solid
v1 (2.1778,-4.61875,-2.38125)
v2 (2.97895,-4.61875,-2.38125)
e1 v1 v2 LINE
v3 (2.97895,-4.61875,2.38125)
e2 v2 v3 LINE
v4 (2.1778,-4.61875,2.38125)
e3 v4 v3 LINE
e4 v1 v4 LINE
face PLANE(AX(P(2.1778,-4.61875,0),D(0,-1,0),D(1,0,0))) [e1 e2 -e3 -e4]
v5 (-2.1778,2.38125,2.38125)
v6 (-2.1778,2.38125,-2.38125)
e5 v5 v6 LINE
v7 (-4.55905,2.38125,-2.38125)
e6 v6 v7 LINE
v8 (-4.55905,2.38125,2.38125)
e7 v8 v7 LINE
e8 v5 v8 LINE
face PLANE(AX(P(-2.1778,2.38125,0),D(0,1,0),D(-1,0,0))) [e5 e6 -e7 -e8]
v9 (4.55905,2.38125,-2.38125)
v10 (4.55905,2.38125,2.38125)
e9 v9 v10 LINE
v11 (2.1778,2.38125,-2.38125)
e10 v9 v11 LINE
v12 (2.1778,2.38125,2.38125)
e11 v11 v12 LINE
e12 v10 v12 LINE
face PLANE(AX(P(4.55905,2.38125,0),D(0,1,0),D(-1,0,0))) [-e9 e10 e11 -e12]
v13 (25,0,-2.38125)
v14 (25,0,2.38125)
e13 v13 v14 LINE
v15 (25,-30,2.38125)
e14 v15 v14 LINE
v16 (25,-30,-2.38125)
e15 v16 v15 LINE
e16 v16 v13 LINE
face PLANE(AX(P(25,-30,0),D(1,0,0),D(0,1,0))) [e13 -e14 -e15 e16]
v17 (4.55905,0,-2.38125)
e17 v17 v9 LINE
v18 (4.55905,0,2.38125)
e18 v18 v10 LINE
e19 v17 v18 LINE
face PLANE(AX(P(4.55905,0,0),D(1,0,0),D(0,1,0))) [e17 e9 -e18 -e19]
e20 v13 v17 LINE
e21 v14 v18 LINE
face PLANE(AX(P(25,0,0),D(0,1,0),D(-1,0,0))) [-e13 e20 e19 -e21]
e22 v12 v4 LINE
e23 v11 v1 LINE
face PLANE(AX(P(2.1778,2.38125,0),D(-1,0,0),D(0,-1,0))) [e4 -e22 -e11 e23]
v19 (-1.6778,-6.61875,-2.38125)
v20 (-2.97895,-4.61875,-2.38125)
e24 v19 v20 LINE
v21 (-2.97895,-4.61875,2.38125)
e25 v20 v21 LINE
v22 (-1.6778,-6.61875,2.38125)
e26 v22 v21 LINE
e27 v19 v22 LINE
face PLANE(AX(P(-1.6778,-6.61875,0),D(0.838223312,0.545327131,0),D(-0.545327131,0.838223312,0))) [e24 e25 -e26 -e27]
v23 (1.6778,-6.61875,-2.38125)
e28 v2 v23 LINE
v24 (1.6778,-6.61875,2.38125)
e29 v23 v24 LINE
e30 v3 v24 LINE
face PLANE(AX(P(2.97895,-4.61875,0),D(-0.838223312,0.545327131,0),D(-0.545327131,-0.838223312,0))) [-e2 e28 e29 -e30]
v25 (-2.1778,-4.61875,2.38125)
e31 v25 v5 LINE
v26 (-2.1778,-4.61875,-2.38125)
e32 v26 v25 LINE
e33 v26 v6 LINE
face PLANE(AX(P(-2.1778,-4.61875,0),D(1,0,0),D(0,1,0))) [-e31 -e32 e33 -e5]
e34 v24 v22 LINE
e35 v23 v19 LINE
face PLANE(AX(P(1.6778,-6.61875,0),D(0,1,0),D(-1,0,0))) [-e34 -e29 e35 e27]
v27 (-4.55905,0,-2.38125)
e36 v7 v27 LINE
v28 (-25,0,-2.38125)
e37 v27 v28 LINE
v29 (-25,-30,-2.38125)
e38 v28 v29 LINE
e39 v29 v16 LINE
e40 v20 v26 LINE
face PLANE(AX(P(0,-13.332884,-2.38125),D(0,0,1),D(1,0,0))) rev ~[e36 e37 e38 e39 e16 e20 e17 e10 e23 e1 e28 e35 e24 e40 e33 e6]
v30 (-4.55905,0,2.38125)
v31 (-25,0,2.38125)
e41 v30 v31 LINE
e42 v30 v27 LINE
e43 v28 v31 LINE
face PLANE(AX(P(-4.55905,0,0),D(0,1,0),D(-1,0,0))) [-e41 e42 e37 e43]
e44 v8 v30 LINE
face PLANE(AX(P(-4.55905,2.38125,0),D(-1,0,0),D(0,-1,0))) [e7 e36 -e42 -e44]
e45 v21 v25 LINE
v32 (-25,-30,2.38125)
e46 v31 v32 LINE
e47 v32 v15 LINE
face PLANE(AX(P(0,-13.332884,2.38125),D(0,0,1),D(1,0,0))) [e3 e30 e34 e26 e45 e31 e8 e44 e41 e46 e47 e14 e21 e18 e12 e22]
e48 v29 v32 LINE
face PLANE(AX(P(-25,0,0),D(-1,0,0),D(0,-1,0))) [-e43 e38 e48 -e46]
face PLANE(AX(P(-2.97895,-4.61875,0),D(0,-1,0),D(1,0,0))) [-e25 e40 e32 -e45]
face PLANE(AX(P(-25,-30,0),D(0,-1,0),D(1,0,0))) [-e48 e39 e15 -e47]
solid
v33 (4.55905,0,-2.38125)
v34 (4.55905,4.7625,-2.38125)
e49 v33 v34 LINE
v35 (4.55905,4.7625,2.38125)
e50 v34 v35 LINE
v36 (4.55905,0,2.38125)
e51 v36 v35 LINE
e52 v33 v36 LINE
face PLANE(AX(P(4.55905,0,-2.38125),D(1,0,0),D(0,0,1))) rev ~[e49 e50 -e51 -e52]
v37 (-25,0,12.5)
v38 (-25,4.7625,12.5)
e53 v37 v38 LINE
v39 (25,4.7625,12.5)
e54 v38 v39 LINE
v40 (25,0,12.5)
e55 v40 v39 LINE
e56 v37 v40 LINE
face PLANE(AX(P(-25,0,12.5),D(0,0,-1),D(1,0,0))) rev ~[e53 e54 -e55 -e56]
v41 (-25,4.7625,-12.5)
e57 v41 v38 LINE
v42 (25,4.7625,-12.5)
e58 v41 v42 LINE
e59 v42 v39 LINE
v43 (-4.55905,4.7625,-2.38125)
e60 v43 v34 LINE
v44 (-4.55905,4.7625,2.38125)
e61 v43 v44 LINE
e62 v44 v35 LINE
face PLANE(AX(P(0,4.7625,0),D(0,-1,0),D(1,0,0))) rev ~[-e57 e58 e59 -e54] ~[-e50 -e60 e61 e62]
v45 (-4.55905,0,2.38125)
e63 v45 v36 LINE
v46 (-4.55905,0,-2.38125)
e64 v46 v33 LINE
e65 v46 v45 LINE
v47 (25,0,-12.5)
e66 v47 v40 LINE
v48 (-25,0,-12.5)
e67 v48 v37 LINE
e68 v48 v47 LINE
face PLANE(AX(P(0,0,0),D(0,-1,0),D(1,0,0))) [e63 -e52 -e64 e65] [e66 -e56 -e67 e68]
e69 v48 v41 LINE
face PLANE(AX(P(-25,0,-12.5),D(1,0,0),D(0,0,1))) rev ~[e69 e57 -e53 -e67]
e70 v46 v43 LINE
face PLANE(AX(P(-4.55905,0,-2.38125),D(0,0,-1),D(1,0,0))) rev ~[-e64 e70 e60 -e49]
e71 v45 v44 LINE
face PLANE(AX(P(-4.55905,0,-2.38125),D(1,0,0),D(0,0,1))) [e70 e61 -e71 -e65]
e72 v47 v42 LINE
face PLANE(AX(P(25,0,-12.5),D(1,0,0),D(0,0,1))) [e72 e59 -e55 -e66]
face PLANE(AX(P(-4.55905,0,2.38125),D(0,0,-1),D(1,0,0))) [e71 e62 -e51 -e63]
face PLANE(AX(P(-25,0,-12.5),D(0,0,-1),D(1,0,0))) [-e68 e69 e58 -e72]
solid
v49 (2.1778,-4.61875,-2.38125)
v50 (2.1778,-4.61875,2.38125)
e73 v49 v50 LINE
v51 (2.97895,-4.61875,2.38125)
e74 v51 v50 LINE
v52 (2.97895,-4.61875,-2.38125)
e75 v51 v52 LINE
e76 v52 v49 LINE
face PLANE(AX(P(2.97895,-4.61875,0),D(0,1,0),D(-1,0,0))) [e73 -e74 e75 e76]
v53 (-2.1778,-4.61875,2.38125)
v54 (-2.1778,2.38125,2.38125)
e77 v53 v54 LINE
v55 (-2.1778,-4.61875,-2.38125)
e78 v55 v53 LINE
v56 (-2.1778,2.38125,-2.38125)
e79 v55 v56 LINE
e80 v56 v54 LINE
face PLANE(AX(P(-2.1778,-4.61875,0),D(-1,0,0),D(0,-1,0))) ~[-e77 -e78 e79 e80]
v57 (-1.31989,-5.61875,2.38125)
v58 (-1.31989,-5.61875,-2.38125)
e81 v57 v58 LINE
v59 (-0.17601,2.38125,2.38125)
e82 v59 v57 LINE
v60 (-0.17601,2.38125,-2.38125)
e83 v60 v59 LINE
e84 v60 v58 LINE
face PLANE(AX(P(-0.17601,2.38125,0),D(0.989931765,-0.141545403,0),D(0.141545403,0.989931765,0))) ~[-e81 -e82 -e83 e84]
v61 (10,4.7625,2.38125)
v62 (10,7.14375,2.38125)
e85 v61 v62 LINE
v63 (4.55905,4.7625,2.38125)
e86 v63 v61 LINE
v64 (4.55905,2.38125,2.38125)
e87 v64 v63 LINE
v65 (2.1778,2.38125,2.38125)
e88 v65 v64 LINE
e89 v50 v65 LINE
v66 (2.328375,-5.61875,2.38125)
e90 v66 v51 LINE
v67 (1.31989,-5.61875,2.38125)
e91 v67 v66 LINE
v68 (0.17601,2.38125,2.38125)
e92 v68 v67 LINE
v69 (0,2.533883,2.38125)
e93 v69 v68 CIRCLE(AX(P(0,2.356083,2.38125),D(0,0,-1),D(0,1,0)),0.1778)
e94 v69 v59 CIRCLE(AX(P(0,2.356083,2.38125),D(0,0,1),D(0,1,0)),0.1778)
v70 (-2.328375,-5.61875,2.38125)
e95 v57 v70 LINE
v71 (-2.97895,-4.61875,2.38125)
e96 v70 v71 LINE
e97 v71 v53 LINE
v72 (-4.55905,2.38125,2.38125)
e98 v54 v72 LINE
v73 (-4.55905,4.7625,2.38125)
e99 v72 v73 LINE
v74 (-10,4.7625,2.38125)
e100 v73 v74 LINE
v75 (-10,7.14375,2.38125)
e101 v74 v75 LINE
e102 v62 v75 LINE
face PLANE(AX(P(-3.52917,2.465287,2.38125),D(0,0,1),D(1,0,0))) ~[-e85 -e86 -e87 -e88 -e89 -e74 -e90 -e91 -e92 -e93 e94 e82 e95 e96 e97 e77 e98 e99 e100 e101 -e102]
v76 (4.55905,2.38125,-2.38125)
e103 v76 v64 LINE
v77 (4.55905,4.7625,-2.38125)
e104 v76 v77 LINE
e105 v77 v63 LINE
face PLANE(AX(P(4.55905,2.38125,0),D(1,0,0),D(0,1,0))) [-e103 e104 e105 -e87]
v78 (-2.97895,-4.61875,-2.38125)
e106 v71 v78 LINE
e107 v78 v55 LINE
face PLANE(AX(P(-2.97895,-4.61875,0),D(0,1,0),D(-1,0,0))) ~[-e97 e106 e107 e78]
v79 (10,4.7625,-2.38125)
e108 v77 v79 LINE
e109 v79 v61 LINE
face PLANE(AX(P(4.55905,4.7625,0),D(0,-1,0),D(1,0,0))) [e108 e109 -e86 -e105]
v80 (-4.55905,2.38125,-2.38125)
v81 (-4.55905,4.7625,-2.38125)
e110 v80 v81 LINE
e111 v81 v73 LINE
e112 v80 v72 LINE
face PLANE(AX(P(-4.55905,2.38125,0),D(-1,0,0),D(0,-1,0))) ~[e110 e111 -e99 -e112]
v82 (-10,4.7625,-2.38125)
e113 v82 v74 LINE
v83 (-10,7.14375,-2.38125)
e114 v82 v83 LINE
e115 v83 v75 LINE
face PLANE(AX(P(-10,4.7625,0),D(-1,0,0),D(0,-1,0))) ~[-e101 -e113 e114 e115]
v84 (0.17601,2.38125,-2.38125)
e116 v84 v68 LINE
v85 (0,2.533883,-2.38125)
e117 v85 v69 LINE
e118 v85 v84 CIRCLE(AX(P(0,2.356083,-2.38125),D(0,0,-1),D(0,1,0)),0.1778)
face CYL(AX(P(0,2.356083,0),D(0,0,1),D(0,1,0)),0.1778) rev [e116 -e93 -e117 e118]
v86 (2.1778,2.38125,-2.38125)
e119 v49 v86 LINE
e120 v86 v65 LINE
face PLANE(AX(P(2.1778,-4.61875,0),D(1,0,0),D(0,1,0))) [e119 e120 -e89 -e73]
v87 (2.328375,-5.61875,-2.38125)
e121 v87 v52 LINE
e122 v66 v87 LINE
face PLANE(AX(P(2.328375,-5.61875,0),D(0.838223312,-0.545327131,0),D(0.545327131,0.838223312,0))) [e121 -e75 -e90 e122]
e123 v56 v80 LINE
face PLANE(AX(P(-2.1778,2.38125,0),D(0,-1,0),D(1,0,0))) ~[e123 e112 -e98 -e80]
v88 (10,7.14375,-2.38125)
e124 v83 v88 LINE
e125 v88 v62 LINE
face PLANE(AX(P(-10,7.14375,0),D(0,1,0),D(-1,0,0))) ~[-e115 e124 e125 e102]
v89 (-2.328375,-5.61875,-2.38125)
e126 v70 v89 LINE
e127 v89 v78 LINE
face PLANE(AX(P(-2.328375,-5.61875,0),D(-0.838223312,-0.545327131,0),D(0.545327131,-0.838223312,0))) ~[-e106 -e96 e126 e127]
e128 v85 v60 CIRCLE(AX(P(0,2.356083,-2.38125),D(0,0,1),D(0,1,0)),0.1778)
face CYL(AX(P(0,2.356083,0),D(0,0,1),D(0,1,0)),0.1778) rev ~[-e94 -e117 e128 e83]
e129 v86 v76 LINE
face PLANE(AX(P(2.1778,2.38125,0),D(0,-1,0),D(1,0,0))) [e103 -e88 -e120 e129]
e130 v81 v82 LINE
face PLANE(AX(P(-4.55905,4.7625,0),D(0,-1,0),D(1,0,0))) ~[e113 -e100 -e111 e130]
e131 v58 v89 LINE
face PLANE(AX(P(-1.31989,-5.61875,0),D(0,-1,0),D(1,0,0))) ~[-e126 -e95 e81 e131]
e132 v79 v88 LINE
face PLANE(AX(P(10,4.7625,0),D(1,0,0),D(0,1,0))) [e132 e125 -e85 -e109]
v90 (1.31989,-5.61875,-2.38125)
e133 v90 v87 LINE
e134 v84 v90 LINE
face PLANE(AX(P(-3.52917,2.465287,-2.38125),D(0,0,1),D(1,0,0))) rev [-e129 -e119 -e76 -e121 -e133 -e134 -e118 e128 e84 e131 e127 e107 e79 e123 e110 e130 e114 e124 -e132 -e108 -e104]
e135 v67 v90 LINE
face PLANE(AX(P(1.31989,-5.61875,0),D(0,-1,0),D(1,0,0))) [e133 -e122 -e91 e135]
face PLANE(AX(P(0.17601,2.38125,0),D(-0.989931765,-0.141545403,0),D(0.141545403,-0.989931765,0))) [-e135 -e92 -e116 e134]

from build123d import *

# Parameters (mm, degrees)
F2_DEPTH = 2.38125
F3_W     = 50
F3_H     = 25
F3_W_2   = 9.1181
F3_H_2   = 4.7625
F4_DEPTH = 4.7625
F6_DEPTH = 2.38125


# Not quite as in the source:
# - a length typed as a fraction of an inch, garbled in the dataset ("3 / 203.2 mm" for 3/8 in), is restored


with BuildPart() as f2:
    # F1 (on Top) → F2 (new body, symmetric)
    with BuildSketch(Plane.XY):
        Polygon((-4.55905, 0), (-25, 0), (-25, -30), (0, -30), (25, -30), (25, 0), (4.55905, 0), (4.55905, 2.38125), (2.1778, 2.38125), (2.1778, -4.61875), (2.97895, -4.61875), (1.6778, -6.61875), (-1.6778, -6.61875), (-2.97895, -4.61875), (-2.1778, -4.61875), (-2.1778, 2.38125), (-4.55905, 2.38125), align=None)
    extrude(amount=F2_DEPTH, both=True)


with BuildPart() as f4:
    # F3 (on Front) → F4 (new body)
    with BuildSketch(Plane.XZ):
        Rectangle(F3_W, F3_H)
        Rectangle(F3_W_2, F3_H_2, mode=Mode.SUBTRACT)
    extrude(amount=-F4_DEPTH)


with BuildPart() as f6:
    # F5 (on Top) → F6 (new body, symmetric)
    with BuildSketch(Plane.XY):
        with BuildLine():
            Line((2.97895, -4.61875), (2.1778, -4.61875))
            Line((2.1778, -4.61875), (2.1778, 2.38125))
            Line((2.1778, 2.38125), (4.55905, 2.38125))
            Line((4.55905, 2.38125), (4.55905, 4.7625))
            Line((4.55905, 4.7625), (10, 4.7625))
            Line((10, 4.7625), (10, 7.14375))
            Line((10, 7.14375), (0, 7.14375))
            Line((0, 7.14375), (0, 2.5338832274))
            ThreePointArc((0, 2.5338832274), (0.1164864538, 2.4904102391), (0.1760098678, 2.38125))
            Line((0.1760098678, 2.38125), (1.3198899433, -5.61875))
            Line((1.3198899433, -5.61875), (2.328375, -5.61875))
            Line((2.328375, -5.61875), (2.97895, -4.61875))
        make_face()
    extrude(amount=F6_DEPTH, both=True)

    # F7: F6 across face


with BuildPart() as f6_1:
    add(f6.part)
    add(f6.part.mirror(Plane(origin=(0, 4.8388166137, 0), x_dir=(0, -1, 0), z_dir=(-1, 0, 0))))


solid = Compound([f2.part, f4.part, f6_1.part])
